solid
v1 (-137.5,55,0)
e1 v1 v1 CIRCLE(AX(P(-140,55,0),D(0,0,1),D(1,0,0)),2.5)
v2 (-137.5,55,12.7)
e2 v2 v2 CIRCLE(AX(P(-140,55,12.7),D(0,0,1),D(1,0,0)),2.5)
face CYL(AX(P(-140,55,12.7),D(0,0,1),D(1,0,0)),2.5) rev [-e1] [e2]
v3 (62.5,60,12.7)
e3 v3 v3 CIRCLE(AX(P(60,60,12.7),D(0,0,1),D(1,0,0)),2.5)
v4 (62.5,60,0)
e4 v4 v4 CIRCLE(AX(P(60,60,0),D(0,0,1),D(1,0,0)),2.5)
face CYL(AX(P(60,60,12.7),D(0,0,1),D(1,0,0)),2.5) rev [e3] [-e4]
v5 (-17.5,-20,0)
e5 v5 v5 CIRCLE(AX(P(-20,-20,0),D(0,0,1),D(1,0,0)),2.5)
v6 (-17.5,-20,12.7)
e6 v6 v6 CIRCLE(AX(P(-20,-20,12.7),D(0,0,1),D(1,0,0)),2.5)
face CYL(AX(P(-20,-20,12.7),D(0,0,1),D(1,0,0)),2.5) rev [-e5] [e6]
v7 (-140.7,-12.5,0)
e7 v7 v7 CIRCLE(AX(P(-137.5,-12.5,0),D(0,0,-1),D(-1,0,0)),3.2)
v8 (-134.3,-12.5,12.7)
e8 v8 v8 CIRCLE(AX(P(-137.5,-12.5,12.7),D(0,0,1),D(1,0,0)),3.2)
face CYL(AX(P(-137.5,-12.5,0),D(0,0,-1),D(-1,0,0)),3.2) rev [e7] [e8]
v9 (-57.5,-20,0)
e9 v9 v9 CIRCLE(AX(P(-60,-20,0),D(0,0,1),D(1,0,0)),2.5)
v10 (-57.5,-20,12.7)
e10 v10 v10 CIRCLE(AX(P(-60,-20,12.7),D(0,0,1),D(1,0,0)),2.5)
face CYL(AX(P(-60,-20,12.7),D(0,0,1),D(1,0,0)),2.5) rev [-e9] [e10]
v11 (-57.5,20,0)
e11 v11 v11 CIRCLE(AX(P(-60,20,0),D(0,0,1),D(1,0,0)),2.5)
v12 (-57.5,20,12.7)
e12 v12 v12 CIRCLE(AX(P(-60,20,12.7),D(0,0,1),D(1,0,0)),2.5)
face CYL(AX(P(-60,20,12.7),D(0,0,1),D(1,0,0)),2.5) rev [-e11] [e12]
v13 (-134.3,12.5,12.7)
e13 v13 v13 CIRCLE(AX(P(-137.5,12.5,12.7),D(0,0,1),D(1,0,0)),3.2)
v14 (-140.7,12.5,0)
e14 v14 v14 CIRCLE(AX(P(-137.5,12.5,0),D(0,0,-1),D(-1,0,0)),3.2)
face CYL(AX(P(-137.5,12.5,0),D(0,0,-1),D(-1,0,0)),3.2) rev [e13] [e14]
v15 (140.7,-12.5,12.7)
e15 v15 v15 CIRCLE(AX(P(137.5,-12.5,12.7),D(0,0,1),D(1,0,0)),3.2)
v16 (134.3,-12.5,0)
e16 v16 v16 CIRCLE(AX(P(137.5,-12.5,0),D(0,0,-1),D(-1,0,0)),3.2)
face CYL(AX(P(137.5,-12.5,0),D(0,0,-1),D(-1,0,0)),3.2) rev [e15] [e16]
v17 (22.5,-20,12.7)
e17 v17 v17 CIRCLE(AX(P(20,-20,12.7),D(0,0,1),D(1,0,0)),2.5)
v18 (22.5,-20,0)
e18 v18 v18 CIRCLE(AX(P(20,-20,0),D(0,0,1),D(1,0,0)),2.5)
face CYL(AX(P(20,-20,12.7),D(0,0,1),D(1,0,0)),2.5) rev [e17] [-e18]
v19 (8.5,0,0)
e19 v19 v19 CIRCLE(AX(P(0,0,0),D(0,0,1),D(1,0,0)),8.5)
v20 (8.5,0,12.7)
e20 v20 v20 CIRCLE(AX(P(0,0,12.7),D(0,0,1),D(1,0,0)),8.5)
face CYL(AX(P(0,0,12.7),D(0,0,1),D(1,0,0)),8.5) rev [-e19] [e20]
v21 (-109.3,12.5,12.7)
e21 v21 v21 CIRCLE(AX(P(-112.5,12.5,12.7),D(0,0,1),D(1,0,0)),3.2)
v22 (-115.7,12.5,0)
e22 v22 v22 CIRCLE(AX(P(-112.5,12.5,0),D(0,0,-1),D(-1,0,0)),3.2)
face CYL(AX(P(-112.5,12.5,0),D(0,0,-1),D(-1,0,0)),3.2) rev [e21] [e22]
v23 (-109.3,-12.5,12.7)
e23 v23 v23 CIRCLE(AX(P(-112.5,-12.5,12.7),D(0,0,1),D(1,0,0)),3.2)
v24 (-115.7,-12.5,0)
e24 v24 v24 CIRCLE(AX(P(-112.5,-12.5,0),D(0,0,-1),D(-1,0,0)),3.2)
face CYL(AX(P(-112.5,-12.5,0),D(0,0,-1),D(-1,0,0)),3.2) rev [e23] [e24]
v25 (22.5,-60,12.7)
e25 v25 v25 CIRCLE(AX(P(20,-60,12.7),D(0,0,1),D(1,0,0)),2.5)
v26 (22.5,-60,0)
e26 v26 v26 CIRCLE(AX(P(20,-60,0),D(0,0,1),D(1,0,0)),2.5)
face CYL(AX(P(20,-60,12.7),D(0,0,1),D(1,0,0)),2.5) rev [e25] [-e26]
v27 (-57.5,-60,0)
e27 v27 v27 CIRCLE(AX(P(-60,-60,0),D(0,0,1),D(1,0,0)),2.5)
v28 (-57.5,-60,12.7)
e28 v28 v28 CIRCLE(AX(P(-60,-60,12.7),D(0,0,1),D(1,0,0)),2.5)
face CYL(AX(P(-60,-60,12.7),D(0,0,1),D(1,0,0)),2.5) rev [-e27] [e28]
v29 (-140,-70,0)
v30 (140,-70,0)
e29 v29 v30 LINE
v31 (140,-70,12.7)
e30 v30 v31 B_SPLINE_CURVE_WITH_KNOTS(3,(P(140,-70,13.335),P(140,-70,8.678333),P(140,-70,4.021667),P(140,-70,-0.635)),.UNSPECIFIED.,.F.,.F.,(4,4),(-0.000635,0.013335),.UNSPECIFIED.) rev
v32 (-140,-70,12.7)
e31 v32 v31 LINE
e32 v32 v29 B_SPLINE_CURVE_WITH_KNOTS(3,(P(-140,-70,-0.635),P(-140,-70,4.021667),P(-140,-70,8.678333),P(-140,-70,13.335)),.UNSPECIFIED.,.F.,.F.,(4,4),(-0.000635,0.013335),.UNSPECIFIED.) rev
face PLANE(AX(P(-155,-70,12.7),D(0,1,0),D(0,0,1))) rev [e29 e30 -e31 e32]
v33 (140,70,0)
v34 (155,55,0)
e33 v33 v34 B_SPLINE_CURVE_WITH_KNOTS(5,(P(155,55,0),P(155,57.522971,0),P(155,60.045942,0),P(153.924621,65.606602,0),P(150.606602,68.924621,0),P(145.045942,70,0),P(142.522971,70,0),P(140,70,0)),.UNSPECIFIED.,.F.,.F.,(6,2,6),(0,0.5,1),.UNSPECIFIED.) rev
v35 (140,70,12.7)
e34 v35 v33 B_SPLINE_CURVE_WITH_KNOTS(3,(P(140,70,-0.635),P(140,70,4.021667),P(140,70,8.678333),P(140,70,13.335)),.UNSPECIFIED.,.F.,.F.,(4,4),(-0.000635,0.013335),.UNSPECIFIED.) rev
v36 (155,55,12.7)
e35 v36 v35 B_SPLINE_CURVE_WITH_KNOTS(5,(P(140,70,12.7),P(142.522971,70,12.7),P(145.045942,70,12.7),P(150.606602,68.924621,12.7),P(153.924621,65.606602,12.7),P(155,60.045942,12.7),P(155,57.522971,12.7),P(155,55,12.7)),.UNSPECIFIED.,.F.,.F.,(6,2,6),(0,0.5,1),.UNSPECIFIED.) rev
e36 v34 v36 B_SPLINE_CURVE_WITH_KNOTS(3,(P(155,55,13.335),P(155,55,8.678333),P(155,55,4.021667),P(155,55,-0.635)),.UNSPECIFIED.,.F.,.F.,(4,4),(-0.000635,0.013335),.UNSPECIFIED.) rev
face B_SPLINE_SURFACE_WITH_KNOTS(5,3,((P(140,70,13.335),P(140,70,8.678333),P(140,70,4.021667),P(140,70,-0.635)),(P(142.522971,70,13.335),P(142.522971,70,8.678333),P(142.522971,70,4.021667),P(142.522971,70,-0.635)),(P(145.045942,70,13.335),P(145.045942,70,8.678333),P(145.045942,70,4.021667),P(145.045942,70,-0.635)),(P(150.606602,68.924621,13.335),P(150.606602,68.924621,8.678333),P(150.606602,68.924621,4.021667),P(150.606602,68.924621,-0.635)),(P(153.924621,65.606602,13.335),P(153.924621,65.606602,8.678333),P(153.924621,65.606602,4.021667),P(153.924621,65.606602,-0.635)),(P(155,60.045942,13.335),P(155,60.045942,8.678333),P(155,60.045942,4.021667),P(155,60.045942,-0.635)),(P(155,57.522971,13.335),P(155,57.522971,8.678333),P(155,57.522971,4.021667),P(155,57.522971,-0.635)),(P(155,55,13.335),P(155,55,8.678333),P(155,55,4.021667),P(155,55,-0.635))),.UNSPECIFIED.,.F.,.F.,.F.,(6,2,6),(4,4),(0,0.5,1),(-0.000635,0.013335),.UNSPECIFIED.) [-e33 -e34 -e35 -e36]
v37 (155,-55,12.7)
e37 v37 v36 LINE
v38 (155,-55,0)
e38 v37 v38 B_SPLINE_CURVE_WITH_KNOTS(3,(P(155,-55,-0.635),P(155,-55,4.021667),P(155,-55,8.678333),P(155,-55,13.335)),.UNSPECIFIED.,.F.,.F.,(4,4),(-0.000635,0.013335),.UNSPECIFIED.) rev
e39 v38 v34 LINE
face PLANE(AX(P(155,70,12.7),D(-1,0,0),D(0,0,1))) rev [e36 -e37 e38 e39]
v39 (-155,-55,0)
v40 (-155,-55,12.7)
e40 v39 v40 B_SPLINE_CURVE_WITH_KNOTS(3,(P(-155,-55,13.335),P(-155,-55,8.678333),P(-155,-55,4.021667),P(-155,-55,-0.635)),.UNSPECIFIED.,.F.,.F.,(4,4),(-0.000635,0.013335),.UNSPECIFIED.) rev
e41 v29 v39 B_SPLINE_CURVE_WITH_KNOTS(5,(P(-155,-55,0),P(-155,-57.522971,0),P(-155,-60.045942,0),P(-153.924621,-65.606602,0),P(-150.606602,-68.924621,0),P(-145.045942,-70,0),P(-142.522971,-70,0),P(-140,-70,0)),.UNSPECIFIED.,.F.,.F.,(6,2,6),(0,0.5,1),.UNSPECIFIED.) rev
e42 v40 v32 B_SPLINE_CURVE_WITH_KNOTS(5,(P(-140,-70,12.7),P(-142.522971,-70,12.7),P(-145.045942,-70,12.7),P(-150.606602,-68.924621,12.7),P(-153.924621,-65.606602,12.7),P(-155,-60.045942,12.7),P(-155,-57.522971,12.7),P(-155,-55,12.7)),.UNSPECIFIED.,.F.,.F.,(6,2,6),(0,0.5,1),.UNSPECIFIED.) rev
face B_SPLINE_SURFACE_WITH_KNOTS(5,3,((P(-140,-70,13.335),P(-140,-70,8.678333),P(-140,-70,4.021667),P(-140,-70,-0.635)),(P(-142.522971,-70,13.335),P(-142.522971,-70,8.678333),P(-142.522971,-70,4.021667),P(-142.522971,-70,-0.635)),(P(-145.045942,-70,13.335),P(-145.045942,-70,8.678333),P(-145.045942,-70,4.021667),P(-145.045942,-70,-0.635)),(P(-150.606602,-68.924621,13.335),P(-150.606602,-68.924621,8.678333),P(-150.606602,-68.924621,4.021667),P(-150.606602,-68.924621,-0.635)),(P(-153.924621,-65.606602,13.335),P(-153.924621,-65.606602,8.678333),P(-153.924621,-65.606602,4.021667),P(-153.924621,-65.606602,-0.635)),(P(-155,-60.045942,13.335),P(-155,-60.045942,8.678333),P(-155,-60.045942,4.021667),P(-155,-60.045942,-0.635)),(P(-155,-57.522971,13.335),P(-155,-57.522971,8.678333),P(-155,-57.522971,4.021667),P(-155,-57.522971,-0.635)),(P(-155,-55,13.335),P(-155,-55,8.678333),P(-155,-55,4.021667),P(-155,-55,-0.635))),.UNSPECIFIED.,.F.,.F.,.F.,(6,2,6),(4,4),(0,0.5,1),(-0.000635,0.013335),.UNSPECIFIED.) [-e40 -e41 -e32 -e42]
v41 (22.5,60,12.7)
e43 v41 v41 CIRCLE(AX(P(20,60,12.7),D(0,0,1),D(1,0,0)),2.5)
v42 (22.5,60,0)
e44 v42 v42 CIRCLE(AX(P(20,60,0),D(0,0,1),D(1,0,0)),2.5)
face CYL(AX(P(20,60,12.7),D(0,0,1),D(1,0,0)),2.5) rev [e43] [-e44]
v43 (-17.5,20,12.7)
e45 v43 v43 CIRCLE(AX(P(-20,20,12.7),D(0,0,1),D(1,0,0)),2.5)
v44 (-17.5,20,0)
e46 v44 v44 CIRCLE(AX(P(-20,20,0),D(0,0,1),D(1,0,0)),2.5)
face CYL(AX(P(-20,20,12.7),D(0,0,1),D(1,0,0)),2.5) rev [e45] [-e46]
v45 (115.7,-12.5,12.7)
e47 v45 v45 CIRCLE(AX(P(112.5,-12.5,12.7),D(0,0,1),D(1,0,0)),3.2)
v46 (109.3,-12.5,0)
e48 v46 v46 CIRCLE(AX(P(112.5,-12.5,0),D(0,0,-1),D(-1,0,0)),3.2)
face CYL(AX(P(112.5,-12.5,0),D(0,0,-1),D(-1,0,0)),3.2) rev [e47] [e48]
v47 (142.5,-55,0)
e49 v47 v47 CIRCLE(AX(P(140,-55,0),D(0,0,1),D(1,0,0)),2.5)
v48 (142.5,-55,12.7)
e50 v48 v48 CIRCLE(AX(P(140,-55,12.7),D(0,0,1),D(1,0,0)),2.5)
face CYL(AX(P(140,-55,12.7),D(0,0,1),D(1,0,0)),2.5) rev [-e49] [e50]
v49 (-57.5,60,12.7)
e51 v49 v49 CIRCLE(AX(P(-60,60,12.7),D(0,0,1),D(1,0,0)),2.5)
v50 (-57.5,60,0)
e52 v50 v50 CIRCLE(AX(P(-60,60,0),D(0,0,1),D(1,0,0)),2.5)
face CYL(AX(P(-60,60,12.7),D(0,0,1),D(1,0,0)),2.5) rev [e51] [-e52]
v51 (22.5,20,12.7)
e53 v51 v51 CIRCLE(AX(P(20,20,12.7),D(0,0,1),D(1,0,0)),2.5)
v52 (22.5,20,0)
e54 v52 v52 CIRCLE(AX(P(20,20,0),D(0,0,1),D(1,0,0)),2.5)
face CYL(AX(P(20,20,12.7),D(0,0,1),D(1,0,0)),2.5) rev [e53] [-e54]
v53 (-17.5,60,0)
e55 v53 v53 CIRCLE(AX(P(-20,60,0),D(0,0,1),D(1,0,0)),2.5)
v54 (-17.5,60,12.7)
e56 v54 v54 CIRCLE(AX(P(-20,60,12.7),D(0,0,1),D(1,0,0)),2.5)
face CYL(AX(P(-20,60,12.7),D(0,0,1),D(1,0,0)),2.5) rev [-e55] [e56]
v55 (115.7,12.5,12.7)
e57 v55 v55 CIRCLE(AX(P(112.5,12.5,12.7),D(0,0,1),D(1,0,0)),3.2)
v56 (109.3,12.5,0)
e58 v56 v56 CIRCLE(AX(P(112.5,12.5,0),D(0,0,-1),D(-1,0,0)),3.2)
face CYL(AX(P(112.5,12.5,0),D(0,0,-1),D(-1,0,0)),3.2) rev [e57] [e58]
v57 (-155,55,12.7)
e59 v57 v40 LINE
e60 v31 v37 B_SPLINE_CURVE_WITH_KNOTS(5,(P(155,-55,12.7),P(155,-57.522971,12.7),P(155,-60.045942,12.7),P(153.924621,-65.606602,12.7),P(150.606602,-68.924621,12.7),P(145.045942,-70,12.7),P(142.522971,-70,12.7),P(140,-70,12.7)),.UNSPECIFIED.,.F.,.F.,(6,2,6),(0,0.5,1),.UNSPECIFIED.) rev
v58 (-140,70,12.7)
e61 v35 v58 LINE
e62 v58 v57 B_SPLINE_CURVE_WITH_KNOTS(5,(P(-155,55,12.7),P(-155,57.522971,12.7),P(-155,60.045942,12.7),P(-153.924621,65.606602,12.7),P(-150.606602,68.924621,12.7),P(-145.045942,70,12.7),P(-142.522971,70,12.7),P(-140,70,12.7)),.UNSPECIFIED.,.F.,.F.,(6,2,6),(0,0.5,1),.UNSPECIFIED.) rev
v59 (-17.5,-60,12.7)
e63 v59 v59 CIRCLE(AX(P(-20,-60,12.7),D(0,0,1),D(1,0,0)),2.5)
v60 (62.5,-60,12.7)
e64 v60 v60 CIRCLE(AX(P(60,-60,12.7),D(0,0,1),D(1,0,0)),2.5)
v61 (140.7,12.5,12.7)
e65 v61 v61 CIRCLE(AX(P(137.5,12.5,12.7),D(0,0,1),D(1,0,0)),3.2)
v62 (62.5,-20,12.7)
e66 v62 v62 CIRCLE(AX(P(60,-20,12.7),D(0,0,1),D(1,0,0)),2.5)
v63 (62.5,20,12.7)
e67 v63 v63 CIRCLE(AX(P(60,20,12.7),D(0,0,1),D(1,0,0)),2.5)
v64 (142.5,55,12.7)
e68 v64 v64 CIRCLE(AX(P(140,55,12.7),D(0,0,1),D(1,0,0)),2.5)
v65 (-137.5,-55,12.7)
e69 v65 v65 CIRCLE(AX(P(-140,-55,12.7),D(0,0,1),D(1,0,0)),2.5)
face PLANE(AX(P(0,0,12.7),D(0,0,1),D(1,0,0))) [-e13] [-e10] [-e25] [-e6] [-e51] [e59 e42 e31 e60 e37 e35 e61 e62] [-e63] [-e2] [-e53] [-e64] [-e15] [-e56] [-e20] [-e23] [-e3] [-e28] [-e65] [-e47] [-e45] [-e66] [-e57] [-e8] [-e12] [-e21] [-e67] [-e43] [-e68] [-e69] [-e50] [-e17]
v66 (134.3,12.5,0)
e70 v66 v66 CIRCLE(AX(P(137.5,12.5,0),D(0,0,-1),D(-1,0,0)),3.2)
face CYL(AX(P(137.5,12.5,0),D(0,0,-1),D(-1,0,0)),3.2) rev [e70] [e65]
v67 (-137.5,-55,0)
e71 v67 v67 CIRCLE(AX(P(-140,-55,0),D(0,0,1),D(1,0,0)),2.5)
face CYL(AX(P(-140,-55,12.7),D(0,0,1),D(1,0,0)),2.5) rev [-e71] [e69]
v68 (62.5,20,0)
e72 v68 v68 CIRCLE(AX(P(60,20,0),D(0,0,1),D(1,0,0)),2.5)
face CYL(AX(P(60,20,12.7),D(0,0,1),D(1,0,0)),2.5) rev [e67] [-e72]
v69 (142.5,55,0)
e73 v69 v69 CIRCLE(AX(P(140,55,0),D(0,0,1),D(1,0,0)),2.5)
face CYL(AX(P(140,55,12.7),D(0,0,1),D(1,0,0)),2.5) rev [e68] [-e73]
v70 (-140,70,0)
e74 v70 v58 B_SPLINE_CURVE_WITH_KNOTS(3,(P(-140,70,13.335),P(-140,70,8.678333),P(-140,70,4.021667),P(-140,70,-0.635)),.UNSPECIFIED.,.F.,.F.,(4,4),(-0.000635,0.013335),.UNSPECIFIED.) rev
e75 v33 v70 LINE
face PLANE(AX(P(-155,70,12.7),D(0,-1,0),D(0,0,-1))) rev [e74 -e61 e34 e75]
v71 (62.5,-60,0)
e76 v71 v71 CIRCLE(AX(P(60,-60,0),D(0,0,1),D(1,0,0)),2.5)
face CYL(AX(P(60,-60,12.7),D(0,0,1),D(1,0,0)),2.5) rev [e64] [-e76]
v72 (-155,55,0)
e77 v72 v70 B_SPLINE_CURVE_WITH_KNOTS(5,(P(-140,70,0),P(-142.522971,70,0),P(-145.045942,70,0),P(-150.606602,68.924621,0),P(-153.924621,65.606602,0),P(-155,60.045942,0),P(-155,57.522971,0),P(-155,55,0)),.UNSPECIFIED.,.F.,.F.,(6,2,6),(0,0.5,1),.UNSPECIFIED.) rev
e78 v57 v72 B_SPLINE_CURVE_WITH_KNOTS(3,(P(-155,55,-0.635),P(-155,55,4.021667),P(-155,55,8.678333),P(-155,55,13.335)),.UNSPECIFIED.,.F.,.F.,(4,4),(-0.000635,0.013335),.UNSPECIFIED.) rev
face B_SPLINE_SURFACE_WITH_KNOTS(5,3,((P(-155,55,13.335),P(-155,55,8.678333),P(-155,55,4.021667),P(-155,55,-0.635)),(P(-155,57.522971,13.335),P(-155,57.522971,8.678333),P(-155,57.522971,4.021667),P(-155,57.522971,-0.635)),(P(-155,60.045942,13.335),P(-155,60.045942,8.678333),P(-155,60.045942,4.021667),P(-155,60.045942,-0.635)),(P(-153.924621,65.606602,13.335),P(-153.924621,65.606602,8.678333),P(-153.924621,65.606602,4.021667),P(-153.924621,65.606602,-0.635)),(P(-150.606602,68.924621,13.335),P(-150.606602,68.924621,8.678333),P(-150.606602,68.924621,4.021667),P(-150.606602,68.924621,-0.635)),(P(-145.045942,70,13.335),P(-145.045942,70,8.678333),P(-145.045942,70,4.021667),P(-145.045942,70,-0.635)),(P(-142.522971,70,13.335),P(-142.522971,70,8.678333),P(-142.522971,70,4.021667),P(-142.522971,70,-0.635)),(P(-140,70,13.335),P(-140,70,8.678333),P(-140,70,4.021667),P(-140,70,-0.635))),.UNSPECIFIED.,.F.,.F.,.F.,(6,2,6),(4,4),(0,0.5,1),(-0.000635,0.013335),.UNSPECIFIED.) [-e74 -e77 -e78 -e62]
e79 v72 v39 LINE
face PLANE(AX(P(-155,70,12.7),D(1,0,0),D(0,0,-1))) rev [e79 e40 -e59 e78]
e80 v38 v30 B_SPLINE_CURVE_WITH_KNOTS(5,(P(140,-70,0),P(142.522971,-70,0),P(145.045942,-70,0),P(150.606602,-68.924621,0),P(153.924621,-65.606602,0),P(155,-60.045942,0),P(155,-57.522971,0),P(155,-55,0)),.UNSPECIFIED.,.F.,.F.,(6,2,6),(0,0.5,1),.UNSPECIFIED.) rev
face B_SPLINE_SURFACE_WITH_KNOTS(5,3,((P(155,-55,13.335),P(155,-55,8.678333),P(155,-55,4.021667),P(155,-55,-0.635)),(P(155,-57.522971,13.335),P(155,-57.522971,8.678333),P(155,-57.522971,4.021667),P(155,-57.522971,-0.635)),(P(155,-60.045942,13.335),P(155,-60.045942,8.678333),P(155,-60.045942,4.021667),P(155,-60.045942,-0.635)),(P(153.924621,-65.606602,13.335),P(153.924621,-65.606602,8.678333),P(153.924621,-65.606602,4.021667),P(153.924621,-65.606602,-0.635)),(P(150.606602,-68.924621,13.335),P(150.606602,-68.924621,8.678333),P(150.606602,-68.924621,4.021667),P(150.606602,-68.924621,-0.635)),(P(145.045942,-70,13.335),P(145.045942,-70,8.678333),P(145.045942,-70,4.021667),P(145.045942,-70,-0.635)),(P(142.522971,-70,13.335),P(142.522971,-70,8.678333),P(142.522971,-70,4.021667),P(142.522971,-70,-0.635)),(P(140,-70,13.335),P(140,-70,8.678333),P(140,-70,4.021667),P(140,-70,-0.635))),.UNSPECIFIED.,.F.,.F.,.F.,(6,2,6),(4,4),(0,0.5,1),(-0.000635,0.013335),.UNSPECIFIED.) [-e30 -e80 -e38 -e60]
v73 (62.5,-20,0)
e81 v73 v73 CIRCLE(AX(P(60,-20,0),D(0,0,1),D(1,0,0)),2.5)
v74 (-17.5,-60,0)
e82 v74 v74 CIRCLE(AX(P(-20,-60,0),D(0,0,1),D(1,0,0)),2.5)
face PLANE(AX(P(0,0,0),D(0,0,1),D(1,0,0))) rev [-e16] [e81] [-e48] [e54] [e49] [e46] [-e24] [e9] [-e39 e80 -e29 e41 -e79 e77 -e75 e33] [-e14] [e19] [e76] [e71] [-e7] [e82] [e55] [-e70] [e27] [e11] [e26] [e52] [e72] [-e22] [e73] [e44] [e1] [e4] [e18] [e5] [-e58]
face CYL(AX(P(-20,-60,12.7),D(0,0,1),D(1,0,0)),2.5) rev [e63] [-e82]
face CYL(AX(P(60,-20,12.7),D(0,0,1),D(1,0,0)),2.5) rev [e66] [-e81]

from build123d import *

# Parameters (mm, degrees)
SKETCH1_W                           = 310
SKETCH1_H                           = 140
BOSS_EXTRUDE1_DEPTH                 = 12.7
TAP_DRILL_FOR_M6X1_0_TAP1_D         = 5
LPATTERN1_COUNT                     = 4
LPATTERN1_PITCH                     = 40
LPATTERN1_COUNT_DIR2                = 4
LPATTERN1_PITCH_DIR2                = 40
FILLET1_SIZE                        = 15
M6_CLEARANCE_HOLE1_D                = 6.4
M16_CLEARANCE_HOLE1_D               = 17
TAP_START                           = -1
TAP_DRILL_FOR_M6X1_0_TAP2_OUTLINE_R = 2.5
TAP_DRILL_FOR_M6X1_0_TAP2_DEPTH     = 15


with BuildPart() as part:
    # Sketch1 → Boss-Extrude1 (new body)
    with BuildSketch(Plane.XY):
        Rectangle(SKETCH1_W, SKETCH1_H)
    extrude(amount=BOSS_EXTRUDE1_DEPTH)

    # Tap Drill for M6x1.0 Tap1 (through all)
    with Locations(Plane.XY.offset(12.7)):
        with Locations((-60, 60)):
            tap_drill_for_m6x1_0_tap1 = Hole(TAP_DRILL_FOR_M6X1_0_TAP1_D / 2)

    # LPattern1: Tap Drill for M6x1.0 Tap1 4 × 4
    with Locations(*[(i * LPATTERN1_PITCH, -j * LPATTERN1_PITCH_DIR2, 0) for i in range(LPATTERN1_COUNT) for j in range(LPATTERN1_COUNT_DIR2) if (i, j) != (0, 0)]):
        add(tap_drill_for_m6x1_0_tap1, mode=Mode.SUBTRACT)

    # Fillet1
    # a fillet whose section is not a circle: 15 mm, written as the material it takes off along each edge
    with BuildSketch(Plane(origin=(155, -70, -37.5), x_dir=(0, 1, 0), z_dir=(0, 0, 1)), Plane(origin=(155, 70, -37.5), x_dir=(-1, 0, 0), z_dir=(0, 0, 1))) as fillet1_piece_1:
        with BuildLine():
            add(Edge.make_bspline([(FILLET1_SIZE, 0), (FILLET1_SIZE * 0.831801948466, 0), (FILLET1_SIZE * 0.663603896932, 0), (FILLET1_SIZE * 0.292893218813, FILLET1_SIZE * 0.0716919198361), (FILLET1_SIZE * 0.0716919198361, FILLET1_SIZE * 0.292893218813), (0, FILLET1_SIZE * 0.663603896932), (0, FILLET1_SIZE * 0.831801948466), (0, FILLET1_SIZE)], knots=[0, 0, 0, 0, 0, 0, 0.5, 0.5, 1, 1, 1, 1, 1, 1], degree=5))
            Line((0, FILLET1_SIZE), (0, 0))
            Line((0, 0), (FILLET1_SIZE, 0))
        make_face()
    extrude(amount=87.7, mode=Mode.SUBTRACT)
    with BuildSketch(Plane(origin=(-155, 70, -37.5), x_dir=(1, 0, 0), z_dir=(0, 0, 1)), Plane(origin=(-155, -70, -37.5), x_dir=(0, 1, 0), z_dir=(0, 0, 1))) as fillet1_piece_2:
        with BuildLine():
            add(Edge.make_bspline([(FILLET1_SIZE, 0), (FILLET1_SIZE * 0.831801948466, 0), (FILLET1_SIZE * 0.663603896932, 0), (FILLET1_SIZE * 0.292893218813, -FILLET1_SIZE * 0.0716919198361), (FILLET1_SIZE * 0.0716919198361, -FILLET1_SIZE * 0.292893218813), (0, -FILLET1_SIZE * 0.663603896932), (0, -FILLET1_SIZE * 0.831801948466), (0, -FILLET1_SIZE)], knots=[0, 0, 0, 0, 0, 0, 0.5, 0.5, 1, 1, 1, 1, 1, 1], degree=5))
            Line((0, -FILLET1_SIZE), (0, 0))
            Line((0, 0), (FILLET1_SIZE, 0))
        make_face()
    extrude(amount=87.7, mode=Mode.SUBTRACT)

    # M6 Clearance Hole1 (through all)
    with Locations(Plane(origin=(0, 0, 0), x_dir=(-1, 0, 0), z_dir=(0, 0, -1))):
        with Locations((137.5, -12.5), (137.5, 12.5), (112.5, 12.5), (112.5, -12.5), (-112.5, -12.5), (-137.5, -12.5), (-112.5, 12.5), (-137.5, 12.5)):
            Hole(M6_CLEARANCE_HOLE1_D / 2)

    # M16 Clearance Hole1 (through all)
    with Locations(Plane.XY.offset(12.7)):
        with Locations((0, 0)):
            Hole(M16_CLEARANCE_HOLE1_D / 2)

    # Tap Drill for M6x1.0 Tap2: read off the stored shape, not the designer's step
    # Tap Drill for M6x1.0 Tap2 outline → Tap Drill for M6x1.0 Tap2 (cut)
    with BuildSketch(Plane.XY.offset(TAP_START)):
        with Locations((140, 55)):
            Circle(TAP_DRILL_FOR_M6X1_0_TAP2_OUTLINE_R)
        with Locations((-140, -55)):
            Circle(TAP_DRILL_FOR_M6X1_0_TAP2_OUTLINE_R)
        with Locations((140, -55)):
            Circle(TAP_DRILL_FOR_M6X1_0_TAP2_OUTLINE_R)
        with Locations((-140, 55)):
            Circle(TAP_DRILL_FOR_M6X1_0_TAP2_OUTLINE_R)
    extrude(amount=TAP_DRILL_FOR_M6X1_0_TAP2_DEPTH, mode=Mode.SUBTRACT)


solid = part.part
